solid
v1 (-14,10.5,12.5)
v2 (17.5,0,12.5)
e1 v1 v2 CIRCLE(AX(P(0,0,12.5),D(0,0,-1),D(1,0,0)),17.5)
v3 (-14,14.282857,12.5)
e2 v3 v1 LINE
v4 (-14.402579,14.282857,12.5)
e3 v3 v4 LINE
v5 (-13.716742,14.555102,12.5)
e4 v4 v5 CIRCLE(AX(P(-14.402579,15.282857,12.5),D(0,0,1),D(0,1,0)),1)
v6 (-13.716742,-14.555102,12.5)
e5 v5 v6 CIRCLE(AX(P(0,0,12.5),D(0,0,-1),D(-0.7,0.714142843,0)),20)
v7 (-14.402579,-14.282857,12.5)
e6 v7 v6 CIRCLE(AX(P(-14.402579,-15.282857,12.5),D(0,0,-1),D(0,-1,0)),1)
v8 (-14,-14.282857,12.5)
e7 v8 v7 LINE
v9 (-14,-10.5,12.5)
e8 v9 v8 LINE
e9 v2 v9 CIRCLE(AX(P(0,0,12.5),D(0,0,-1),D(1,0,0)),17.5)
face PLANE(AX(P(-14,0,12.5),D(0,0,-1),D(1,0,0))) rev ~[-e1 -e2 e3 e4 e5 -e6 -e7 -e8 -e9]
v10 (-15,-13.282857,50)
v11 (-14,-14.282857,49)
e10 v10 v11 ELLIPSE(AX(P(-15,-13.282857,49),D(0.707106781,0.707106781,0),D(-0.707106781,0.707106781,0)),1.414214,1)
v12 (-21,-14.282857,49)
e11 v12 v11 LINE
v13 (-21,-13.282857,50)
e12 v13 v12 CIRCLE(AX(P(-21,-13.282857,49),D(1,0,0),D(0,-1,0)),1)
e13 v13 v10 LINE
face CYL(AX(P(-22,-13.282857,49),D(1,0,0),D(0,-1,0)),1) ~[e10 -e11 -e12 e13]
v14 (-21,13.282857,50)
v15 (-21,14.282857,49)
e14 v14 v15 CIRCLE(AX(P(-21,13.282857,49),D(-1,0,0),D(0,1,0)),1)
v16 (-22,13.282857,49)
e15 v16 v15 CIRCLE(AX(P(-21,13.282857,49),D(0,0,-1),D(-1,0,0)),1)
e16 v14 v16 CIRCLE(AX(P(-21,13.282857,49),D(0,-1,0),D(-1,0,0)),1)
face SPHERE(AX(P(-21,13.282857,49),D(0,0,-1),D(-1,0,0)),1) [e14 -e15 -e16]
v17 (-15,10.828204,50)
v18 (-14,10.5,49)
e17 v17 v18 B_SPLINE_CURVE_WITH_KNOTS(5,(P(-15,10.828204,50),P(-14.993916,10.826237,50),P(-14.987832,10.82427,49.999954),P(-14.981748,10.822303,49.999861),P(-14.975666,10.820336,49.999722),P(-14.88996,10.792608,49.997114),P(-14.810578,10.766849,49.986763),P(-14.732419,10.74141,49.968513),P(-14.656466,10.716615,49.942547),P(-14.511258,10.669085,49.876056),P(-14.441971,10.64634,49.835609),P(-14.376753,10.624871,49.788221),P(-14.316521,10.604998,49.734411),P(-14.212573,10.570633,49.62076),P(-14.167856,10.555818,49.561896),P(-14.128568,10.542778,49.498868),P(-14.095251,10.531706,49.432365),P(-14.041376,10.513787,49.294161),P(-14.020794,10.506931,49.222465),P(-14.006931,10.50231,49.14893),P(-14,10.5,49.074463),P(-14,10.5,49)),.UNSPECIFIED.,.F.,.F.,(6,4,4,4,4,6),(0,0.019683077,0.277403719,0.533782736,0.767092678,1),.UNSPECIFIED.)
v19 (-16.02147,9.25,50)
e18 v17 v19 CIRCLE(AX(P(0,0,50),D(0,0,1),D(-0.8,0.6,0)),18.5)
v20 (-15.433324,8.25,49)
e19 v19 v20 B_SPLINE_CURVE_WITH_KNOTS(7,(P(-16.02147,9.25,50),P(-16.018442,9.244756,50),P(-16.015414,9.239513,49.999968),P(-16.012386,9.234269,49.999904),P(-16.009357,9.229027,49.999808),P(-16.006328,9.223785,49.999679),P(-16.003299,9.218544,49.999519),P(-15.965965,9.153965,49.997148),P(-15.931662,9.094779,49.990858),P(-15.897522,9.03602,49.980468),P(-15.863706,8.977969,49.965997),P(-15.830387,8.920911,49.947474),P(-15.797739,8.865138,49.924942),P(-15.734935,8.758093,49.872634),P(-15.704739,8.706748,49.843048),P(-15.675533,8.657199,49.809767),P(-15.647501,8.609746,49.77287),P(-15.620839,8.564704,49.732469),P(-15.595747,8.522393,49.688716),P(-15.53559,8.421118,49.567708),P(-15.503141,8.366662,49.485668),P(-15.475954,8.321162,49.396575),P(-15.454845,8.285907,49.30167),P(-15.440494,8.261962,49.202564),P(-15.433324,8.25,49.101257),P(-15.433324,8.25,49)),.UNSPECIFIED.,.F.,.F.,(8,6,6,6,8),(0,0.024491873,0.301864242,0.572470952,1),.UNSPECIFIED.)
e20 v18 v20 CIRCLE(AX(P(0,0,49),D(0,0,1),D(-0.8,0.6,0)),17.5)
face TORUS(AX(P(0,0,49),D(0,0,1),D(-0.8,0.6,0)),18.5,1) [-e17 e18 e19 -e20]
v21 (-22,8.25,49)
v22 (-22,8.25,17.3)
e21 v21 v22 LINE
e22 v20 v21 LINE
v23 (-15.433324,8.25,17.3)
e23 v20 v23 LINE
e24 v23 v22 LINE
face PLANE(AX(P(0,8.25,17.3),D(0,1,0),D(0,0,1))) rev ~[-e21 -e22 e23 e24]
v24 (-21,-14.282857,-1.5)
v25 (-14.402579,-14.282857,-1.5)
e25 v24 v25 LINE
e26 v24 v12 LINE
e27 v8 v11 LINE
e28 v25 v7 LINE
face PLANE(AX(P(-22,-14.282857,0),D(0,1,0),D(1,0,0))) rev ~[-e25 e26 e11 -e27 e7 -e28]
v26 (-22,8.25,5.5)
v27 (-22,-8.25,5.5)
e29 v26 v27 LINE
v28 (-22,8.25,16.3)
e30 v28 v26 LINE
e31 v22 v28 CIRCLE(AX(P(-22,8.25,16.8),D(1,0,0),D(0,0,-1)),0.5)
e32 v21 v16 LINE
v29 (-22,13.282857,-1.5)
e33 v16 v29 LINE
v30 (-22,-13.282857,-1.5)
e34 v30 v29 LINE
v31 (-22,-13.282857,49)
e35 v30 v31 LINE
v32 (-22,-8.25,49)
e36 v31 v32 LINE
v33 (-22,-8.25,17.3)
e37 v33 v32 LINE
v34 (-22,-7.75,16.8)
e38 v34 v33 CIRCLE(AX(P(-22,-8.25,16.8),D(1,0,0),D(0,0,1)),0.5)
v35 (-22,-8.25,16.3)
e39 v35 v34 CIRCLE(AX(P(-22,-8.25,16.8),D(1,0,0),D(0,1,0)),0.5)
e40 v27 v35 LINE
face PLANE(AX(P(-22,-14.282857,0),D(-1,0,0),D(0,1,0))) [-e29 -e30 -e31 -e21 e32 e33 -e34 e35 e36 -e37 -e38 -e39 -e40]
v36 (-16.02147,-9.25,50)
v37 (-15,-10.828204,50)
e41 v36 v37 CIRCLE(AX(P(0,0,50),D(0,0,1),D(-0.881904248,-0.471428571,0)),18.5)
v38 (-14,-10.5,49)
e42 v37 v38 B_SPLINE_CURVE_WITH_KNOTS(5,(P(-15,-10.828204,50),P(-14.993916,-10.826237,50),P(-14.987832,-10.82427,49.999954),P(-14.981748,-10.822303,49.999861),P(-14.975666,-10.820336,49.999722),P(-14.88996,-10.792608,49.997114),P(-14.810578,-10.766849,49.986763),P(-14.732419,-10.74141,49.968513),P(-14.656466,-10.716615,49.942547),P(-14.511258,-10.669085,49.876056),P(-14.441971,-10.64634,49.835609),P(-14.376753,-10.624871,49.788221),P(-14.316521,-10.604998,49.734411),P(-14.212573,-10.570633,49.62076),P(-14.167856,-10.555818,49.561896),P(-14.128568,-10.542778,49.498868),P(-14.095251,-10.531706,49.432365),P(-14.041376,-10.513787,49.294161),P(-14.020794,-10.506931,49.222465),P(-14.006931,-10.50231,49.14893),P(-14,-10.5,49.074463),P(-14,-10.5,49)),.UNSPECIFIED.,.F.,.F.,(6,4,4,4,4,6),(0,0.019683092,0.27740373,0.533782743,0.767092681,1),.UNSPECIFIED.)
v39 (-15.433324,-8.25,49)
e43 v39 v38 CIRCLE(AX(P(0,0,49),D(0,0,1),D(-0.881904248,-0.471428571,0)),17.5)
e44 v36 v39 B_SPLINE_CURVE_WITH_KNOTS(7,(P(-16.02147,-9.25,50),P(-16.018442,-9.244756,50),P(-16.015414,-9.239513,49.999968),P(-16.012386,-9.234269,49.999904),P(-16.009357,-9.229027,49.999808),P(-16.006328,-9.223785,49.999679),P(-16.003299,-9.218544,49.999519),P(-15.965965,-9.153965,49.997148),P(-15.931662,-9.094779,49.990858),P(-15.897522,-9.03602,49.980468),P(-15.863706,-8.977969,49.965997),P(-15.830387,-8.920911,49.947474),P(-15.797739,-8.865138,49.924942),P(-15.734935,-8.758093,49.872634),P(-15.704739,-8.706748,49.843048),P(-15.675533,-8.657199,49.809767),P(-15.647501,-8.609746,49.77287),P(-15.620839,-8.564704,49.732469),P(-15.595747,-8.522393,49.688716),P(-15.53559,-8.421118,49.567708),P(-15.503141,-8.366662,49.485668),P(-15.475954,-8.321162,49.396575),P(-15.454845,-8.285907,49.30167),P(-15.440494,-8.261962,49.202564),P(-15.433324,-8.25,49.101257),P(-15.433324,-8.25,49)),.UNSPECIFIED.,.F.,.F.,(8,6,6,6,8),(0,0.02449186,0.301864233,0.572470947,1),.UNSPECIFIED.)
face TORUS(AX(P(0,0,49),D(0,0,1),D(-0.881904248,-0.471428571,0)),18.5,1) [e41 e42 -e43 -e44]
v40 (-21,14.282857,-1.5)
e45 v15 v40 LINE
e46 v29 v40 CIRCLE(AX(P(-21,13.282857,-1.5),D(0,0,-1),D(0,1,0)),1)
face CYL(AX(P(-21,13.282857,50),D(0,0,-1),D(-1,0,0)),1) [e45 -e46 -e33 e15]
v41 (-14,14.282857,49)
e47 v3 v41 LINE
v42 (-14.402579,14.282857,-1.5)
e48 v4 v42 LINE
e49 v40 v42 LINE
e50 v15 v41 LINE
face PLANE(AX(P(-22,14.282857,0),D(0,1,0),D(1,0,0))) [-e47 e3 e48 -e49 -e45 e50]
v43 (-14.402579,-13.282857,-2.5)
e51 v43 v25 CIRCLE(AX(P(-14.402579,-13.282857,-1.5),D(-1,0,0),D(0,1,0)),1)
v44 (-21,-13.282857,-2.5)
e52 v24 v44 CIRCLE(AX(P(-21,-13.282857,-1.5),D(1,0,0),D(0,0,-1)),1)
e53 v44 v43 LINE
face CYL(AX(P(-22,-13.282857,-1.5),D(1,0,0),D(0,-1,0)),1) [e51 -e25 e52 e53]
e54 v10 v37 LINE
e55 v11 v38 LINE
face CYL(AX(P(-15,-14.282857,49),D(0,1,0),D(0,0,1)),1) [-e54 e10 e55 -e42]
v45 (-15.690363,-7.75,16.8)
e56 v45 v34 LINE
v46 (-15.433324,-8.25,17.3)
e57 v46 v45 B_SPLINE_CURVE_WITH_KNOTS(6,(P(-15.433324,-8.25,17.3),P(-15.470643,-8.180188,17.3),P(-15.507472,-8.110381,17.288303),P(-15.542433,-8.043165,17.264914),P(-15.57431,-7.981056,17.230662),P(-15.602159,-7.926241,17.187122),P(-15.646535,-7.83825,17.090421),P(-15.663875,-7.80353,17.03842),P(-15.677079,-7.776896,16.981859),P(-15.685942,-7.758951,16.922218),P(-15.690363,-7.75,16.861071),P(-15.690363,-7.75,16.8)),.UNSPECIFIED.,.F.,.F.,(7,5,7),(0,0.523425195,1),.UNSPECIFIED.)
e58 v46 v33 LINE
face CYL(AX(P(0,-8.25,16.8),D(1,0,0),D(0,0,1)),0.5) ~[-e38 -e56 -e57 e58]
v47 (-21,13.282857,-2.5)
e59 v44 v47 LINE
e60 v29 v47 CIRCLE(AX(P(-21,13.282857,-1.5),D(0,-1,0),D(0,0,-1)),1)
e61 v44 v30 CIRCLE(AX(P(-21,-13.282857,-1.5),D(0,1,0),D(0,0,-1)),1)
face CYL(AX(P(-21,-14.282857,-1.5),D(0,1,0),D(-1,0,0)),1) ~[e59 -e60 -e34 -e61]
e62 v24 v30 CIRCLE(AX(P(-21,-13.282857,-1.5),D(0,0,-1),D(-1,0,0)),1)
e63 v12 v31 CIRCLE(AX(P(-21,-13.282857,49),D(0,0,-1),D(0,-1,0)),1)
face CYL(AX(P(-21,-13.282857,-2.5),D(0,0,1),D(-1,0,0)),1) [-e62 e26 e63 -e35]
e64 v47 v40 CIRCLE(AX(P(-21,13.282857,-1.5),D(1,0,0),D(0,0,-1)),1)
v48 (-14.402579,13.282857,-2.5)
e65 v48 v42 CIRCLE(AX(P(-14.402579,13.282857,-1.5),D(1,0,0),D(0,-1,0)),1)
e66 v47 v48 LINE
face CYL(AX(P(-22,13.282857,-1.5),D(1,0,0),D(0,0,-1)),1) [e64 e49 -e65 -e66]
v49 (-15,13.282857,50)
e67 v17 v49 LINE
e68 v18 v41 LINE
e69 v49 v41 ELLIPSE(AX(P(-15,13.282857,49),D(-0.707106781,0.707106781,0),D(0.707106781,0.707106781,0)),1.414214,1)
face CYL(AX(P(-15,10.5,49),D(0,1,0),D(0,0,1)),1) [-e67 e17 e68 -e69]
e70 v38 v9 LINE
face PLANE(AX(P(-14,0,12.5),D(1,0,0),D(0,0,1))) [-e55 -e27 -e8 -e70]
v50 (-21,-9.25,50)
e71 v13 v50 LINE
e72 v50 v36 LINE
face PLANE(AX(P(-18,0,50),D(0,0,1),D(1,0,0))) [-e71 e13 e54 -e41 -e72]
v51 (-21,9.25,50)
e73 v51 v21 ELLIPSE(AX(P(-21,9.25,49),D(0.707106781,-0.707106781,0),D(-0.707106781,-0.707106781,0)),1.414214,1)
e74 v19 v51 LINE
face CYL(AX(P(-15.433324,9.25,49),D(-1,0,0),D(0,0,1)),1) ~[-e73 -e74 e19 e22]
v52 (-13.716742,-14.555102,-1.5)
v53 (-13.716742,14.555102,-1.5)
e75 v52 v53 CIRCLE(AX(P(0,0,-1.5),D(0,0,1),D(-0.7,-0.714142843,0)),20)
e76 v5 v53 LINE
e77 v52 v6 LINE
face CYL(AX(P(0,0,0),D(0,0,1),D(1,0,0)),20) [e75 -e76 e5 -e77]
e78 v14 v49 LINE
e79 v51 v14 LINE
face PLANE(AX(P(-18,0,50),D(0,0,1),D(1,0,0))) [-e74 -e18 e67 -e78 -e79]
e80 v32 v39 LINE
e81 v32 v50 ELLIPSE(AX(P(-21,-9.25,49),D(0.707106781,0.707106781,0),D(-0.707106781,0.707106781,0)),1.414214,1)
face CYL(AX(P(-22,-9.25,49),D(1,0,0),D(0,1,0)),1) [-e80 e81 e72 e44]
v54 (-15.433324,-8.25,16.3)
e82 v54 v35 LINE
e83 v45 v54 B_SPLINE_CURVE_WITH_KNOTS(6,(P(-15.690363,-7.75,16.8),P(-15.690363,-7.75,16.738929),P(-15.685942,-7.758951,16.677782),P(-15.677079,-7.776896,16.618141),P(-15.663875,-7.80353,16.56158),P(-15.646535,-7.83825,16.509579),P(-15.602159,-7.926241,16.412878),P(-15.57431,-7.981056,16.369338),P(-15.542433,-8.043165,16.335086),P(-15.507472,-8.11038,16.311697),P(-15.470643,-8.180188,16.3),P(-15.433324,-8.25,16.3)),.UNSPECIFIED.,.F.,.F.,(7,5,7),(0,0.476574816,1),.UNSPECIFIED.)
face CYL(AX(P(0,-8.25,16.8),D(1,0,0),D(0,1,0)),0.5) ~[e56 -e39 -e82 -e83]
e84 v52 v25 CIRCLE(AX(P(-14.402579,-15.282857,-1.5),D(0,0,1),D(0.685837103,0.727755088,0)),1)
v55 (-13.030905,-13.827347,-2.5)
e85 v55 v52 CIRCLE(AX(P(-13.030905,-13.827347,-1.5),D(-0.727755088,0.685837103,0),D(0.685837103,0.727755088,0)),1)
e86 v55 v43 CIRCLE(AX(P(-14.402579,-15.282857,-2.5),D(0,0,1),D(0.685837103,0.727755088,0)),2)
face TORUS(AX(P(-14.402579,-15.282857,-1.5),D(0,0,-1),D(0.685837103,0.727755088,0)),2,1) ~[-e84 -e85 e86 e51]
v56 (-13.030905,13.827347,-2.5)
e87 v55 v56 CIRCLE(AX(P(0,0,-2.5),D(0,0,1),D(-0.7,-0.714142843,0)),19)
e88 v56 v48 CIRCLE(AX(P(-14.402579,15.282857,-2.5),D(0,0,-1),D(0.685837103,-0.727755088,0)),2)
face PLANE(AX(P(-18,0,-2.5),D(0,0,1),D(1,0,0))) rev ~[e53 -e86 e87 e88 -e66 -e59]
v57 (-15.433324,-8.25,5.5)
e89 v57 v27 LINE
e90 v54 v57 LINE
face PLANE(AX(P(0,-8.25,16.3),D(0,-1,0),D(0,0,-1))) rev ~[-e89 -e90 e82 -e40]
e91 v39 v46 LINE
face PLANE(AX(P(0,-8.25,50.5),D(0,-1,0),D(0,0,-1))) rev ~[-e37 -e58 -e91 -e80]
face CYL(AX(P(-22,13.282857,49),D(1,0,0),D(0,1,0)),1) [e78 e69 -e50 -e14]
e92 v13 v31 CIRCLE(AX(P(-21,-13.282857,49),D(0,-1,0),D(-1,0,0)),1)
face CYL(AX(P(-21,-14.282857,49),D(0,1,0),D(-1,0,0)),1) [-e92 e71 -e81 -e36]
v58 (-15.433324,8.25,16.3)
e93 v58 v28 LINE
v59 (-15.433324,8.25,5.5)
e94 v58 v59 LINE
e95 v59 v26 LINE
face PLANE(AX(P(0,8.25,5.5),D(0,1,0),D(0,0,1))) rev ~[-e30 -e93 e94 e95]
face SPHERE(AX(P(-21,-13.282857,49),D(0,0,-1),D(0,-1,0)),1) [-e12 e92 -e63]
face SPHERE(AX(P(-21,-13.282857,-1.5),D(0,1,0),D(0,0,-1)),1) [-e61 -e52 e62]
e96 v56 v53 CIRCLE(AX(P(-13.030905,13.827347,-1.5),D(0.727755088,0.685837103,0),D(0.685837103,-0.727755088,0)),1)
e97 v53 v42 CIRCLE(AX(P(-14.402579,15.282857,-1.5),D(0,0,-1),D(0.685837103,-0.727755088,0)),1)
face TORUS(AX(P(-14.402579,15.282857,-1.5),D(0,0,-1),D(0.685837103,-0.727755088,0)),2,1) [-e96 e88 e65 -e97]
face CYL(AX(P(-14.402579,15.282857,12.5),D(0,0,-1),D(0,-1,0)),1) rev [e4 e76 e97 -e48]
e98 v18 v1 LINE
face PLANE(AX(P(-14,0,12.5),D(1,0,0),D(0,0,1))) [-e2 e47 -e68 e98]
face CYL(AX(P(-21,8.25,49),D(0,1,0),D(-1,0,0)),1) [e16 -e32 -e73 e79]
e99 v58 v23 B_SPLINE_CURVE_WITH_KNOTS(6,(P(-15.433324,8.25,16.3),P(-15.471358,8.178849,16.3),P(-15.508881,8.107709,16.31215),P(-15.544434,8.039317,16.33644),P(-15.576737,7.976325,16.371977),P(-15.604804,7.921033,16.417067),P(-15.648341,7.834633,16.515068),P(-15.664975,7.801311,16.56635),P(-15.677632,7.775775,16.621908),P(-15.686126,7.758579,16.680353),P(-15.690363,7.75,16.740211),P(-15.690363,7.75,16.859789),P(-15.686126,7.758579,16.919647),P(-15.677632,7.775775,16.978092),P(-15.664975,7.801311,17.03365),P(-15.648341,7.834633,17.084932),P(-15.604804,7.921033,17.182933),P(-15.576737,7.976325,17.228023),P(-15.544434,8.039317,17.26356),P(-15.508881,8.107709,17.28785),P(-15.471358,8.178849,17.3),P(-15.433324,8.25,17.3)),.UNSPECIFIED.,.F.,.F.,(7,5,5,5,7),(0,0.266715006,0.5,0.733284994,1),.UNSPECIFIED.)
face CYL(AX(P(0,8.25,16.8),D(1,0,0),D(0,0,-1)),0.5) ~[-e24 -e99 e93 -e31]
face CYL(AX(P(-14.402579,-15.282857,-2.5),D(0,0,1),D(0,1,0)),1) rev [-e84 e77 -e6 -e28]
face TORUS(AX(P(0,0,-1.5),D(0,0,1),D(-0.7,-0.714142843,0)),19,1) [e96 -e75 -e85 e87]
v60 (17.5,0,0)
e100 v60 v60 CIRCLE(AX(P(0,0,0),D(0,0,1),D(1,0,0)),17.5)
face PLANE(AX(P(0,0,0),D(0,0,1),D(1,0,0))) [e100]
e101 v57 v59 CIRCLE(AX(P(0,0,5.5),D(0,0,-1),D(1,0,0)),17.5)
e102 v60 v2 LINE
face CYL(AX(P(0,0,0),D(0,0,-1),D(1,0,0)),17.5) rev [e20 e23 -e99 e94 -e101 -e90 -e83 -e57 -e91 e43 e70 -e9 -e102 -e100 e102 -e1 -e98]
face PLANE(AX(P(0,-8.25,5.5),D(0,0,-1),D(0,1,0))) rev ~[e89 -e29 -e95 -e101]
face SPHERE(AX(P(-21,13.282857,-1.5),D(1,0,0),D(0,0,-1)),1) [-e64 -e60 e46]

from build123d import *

# Parameters (mm, degrees)
F0_R      = 20
F1_DEPTH  = 50
F2_DEPTH  = 2.5
F4_W      = 40
F4_H      = 50
F5_DEPTH  = 25
F6_W      = 8
F6_H      = 28.5657137142
F7_DEPTH  = 2.5
F8_DEPTH  = 50
F3_R      = 17.5
F9_DEPTH  = 50
F11_DEPTH = 25
F12_R     = 1


with BuildPart() as f1:
    # F0 (on Top) → F1 (new body)
    with BuildSketch(Plane.XY):
        Circle(F0_R)
    extrude(amount=F1_DEPTH)

    # F2 (add): a face of the model
    f2_faces = [f1.faces().sort_by_distance(p)[0] for p in [
        (0, 0, 0),
    ]]
    extrude(f2_faces, amount=F2_DEPTH)

    # F4 (on Front) → F5 (cut, symmetric)
    with BuildSketch(Plane.XZ):
        with Locations((6, 37.5)):
            Rectangle(F4_W, F4_H)
    extrude(amount=F5_DEPTH, both=True, mode=Mode.SUBTRACT)

    # F6 (on Top) → F7 (join)
    with BuildSketch(Plane.XY):
        with Locations((-18, 0)):
            Rectangle(F6_W, F6_H)
    extrude(amount=-F7_DEPTH)

    # F6 (on Top) → F8 (join)
    with BuildSketch(Plane.XY):
        with Locations((-18, 0)):
            Rectangle(F6_W, F6_H)
    extrude(amount=F8_DEPTH)

    # F3 (on Top) → F9 (cut)
    with BuildSketch(Plane.XY):
        Circle(F3_R)
    extrude(amount=F9_DEPTH, mode=Mode.SUBTRACT)

    # F10 (on Right) → F11 (cut)
    with BuildSketch(Plane.YZ):
        with BuildLine():
            Line((8.25, 17.3), (8.25, 50.5))
            Line((8.25, 50.5), (-8.25, 50.5))
            Line((-8.25, 50.5), (-8.25, 17.3))
            ThreePointArc((-8.25, 17.3), (-7.8964466094, 17.1535533906), (-7.75, 16.8))
            ThreePointArc((-7.75, 16.8), (-7.8964466094, 16.4464466094), (-8.25, 16.3))
            Line((-8.25, 16.3), (-8.25, 5.5))
            Line((-8.25, 5.5), (8.25, 5.5))
            Line((8.25, 5.5), (8.25, 16.3))
            ThreePointArc((8.25, 16.3), (7.75, 16.8), (8.25, 17.3))
        make_face()
    extrude(amount=-F11_DEPTH, mode=Mode.SUBTRACT)

    # F12
    f12_edges = [f1.edges().sort_by_distance(p)[0] for p in [
        (20, 0, -2.5),
        (-18, 14.282857, -2.5),
        (-22, 0, -2.5),
        (-18, -14.282857, -2.5),
        (-14, -14.282857, 5),
        (-14, 14.282857, 5),
        (-22, 14.282857, 23.75),
        (-22, -14.282857, 23.75),
        (-14.759599, -9.402352, 50),
        (-14, -12.391428, 50),
        (-18, -14.282857, 50),
        (-22, -11.266428, 50),
        (-18.716662, -8.25, 50),
        (-14, 12.391428, 50),
        (-14.759599, 9.402352, 50),
        (-18.716662, 8.25, 50),
        (-22, 11.266428, 50),
        (-18, 14.282857, 50),
    ]]
    fillet(f12_edges, radius=F12_R)


solid = f1.part
